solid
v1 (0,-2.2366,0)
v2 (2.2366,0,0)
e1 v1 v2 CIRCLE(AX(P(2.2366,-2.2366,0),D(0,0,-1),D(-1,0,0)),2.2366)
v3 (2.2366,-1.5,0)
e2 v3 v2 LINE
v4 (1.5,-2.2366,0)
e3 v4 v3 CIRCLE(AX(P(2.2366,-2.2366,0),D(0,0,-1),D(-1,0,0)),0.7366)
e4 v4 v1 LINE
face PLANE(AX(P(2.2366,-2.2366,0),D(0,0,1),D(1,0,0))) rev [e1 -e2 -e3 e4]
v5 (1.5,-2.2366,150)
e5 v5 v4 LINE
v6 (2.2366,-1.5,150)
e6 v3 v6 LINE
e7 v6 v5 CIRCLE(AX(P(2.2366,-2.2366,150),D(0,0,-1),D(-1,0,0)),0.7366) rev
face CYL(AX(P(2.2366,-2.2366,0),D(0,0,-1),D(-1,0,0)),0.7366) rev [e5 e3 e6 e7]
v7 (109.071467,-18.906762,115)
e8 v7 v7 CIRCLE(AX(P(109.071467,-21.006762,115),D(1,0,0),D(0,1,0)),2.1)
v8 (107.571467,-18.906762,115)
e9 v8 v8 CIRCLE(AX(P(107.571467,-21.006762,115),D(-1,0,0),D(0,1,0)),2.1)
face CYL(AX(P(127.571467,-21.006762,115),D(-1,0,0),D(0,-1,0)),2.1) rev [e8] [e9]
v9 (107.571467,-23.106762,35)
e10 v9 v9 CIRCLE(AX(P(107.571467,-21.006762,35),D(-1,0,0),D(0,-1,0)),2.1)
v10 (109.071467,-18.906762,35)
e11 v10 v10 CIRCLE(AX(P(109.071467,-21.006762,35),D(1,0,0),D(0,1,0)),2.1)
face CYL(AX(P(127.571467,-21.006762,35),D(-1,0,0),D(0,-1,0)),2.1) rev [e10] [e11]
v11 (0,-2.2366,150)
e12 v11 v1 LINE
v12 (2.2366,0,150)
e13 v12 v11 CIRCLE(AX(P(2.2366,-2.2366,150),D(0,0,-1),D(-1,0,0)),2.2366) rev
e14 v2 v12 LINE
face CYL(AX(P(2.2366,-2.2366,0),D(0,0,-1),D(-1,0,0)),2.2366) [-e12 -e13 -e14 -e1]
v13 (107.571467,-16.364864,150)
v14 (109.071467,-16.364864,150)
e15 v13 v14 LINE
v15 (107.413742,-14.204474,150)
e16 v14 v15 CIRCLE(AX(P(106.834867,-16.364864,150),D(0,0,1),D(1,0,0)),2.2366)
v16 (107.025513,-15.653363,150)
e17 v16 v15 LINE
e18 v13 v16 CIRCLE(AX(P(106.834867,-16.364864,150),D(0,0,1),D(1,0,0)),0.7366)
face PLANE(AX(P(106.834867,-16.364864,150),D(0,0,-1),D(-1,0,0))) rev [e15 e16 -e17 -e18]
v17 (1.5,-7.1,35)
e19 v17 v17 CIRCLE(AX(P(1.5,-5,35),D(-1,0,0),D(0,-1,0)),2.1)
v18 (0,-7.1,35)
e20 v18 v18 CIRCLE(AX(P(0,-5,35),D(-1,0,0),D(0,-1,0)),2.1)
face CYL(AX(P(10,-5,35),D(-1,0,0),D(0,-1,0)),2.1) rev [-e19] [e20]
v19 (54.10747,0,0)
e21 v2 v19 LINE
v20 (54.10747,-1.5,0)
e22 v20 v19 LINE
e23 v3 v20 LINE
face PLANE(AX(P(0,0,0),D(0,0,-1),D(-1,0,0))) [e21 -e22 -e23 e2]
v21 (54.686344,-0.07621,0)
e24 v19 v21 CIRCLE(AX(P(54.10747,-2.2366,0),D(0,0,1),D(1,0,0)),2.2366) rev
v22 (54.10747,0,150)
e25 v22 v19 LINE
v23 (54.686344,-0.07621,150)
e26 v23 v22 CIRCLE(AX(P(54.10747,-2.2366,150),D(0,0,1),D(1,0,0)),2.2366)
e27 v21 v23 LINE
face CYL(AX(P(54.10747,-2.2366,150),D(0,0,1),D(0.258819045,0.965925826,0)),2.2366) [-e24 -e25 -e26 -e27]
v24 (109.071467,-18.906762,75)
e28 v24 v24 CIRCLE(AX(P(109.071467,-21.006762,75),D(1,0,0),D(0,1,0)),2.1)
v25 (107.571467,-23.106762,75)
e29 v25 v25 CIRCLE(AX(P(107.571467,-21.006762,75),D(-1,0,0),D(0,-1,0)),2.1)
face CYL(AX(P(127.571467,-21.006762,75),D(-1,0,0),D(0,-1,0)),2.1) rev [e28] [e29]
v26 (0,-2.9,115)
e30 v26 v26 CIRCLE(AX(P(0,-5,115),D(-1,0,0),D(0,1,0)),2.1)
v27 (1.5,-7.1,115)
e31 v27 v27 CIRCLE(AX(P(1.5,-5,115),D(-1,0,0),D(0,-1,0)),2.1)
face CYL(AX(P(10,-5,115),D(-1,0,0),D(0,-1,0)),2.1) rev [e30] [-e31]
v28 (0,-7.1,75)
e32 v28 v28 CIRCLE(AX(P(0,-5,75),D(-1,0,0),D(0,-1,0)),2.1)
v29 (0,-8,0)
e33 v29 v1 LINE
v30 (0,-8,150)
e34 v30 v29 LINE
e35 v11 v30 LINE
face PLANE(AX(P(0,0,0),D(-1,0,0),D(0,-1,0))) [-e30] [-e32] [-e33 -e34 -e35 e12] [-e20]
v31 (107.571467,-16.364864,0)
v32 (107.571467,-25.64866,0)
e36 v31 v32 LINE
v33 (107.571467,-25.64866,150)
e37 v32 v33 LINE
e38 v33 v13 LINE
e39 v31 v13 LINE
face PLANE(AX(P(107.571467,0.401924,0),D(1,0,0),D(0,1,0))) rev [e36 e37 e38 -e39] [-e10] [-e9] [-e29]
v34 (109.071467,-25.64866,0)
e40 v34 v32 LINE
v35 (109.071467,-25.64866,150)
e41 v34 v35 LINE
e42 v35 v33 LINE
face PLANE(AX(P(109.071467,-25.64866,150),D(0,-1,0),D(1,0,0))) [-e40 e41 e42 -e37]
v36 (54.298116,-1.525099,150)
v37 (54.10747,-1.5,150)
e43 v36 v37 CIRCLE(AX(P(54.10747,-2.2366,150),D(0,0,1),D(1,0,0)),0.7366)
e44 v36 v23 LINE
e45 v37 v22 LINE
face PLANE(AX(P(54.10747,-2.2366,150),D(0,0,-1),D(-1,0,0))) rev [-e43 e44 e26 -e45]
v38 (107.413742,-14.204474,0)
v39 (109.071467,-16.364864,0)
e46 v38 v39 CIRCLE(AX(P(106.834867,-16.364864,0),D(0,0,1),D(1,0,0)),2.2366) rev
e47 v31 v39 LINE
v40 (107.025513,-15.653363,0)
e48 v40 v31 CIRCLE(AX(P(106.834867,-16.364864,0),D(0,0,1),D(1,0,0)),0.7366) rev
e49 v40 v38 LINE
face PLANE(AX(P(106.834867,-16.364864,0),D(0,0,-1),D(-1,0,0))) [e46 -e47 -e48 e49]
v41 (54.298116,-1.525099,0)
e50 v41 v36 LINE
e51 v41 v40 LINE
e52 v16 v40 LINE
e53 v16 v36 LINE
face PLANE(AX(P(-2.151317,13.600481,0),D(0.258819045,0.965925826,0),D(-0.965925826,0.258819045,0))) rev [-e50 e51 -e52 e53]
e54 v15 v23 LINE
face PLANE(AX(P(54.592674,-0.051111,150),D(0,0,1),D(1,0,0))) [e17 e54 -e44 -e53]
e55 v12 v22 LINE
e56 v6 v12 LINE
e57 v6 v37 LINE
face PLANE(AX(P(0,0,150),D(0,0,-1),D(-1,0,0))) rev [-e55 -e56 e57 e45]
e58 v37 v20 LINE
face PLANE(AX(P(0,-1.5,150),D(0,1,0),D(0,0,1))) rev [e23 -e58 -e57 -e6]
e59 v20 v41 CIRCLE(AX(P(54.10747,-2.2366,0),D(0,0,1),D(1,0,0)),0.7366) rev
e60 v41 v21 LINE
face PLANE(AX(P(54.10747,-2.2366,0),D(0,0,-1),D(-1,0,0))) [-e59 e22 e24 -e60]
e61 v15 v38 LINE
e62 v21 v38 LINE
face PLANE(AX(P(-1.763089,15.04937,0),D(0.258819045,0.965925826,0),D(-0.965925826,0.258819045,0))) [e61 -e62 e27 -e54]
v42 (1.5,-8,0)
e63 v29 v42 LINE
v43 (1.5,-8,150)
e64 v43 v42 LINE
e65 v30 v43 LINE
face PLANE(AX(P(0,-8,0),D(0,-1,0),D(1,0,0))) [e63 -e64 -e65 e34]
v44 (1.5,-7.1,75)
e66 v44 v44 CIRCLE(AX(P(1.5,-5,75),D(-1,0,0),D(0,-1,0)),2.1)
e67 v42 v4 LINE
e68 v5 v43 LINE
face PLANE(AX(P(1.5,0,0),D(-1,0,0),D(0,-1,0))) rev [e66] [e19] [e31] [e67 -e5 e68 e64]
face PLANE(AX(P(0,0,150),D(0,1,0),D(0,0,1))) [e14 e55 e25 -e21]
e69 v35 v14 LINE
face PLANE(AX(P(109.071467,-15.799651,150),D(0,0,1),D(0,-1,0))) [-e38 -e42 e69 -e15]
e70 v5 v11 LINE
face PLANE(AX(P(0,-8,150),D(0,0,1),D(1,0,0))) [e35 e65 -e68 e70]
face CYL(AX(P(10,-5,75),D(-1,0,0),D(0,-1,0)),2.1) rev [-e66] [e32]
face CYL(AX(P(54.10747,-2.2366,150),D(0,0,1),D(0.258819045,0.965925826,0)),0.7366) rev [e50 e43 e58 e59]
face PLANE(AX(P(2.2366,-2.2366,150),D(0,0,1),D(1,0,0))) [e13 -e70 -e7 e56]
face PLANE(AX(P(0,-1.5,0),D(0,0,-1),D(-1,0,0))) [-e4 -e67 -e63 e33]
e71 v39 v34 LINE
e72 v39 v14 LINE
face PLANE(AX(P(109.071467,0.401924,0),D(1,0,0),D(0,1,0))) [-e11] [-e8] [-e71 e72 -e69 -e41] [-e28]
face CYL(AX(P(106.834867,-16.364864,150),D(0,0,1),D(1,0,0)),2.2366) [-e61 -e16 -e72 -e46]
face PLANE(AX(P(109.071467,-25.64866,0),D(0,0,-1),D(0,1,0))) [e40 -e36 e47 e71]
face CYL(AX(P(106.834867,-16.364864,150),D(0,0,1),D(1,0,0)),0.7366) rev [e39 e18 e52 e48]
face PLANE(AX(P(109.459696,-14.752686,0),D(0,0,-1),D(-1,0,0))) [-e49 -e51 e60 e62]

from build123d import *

# Parameters (mm, degrees)
SKETCH_1_W                       = 60
SKETCH_1_H                       = 1.5
SM_BASE_FLANGE_1_DEPTH           = 150
SM_EDGE_FLANGE_1_DEPTH           = 150
SM_EDGE_FLANGE_1_2_DEPTH         = 150
SM_EDGE_FLANGE_2_STRIP_W         = 7.4732
SM_EDGE_FLANGE_2_STRIP_H         = 1.5
SM_EDGE_FLANGE_2_STRIP_CUT_DEPTH = 150
SM_EDGE_FLANGE_2_DEPTH           = 150
SKETCH_12_R                      = 2.1
CUT_EXTRUDE_1_DEPTH              = 10
SM_EDGE_FLANGE_3_DEPTH           = 150
SM_EDGE_FLANGE_3_2_DEPTH         = 150
SKETCH_16_R                      = 2.1
CUT_EXTRUDE_2_DEPTH              = 20


# Read off the part's stored shape, not the designer's step: 边线-法兰1, 边线-法兰3
# Sheet-metal steps are written as plain solids
with BuildPart() as part:
    # Sketch 1 → 基体-法兰1 (new body)
    with BuildSketch(Plane.XY):
        with Locations((30, -0.75)):
            Rectangle(SKETCH_1_W, SKETCH_1_H)
    extrude(amount=SM_BASE_FLANGE_1_DEPTH)

    # 边线-法兰1 outline → 边线-法兰1 (cut)
    with BuildSketch(Plane.XY):
        with BuildLine():
            ThreePointArc((54.107469813, 0), (54.399404694, -0.019134423), (54.686344489, -0.076210297))
            Line((54.686344489, -0.076210297), (60, -1.5))
            Line((60, -1.5), (60, 0))
            Line((60, 0), (54.107469813, 0))
        make_face()
    extrude(amount=SM_EDGE_FLANGE_1_DEPTH, mode=Mode.SUBTRACT)

    # Sm Edge Flange 1 2 outline → Sm Edge Flange 1 2 (add)
    with BuildSketch(Plane.XY):
        with BuildLine():
            Line((109.459695887, -14.752685571), (60, -1.5))
            Line((60, -1.5), (54.107469813, -1.5))
            ThreePointArc((54.107469813, -1.5), (54.203615406, -1.506301715), (54.298115921, -1.525099036))
            Line((54.298115921, -1.525099036), (109.071467319, -16.20157431))
            Line((109.071467319, -16.20157431), (109.459695887, -14.752685571))
        make_face()
    extrude(amount=SM_EDGE_FLANGE_1_2_DEPTH)

    # 边线-法兰2 strip (across the edge) → 边线-法兰2 strip cut (cut)
    with BuildSketch(Plane(origin=(0, -1.5, 150), x_dir=(1, 0, 0), z_dir=(0, 0, -1))):
        with Locations((-1.5, -0.75)):
            Rectangle(SM_EDGE_FLANGE_2_STRIP_W, SM_EDGE_FLANGE_2_STRIP_H)
    extrude(amount=SM_EDGE_FLANGE_2_STRIP_CUT_DEPTH, mode=Mode.SUBTRACT)

    # 边线-法兰2 section (across the edge) → 边线-法兰2 (add)
    with BuildSketch(Plane(origin=(0, -1.5, 150), x_dir=(1, 0, 0), z_dir=(0, 0, -1))):
        with BuildLine():
            Line((0, 0.7366), (0, 6.5))
            Line((0, 6.5), (1.5, 6.5))
            Line((1.5, 6.5), (1.5, 0.7366))
            ThreePointArc((1.5, 0.7366), (1.715745145, 0.215745145), (2.2366, 0))
            Line((2.2366, 0), (2.2366, -1.5))
            ThreePointArc((2.2366, -1.5), (0.655084973, -0.844915027), (0, 0.7366))
        make_face()
    extrude(amount=SM_EDGE_FLANGE_2_DEPTH)

    # 草图12 → 切除-拉伸1 (cut)
    with BuildSketch(Plane.ZY):
        with Locations(Location((35, -5, 0), (0, 0, 270))):
            Circle(SKETCH_12_R)
        with Locations(Location((75, -5, 0), (0, 0, 270))):
            Circle(SKETCH_12_R)
        with Locations(Location((115, -5, 0), (0, 0, 270))):
            Circle(SKETCH_12_R)
    extrude(amount=-CUT_EXTRUDE_1_DEPTH, mode=Mode.SUBTRACT)

    # 边线-法兰3 outline → 边线-法兰3 (cut)
    with BuildSketch(Plane.XY):
        with BuildLine():
            ThreePointArc((107.413741996, -14.204473878), (108.55784048, -14.938769949), (109.065378631, -16.199942851))
            Line((109.065378631, -16.199942851), (109.071467319, -16.20157431))
            Line((109.071467319, -16.20157431), (109.459695887, -14.752685571))
            Line((109.459695887, -14.752685571), (107.413741996, -14.204473878))
        make_face()
    extrude(amount=SM_EDGE_FLANGE_3_DEPTH, mode=Mode.SUBTRACT)

    # Sm Edge Flange 3 2 outline → Sm Edge Flange 3 2 (add)
    with BuildSketch(Plane.XY):
        with BuildLine():
            Line((109.071467319, -25.64866004), (109.071467319, -16.364863581))
            ThreePointArc((109.071467319, -16.364863581), (109.069944629, -16.282347038), (109.065378631, -16.199942851))
            Line((109.065378631, -16.199942851), (107.025513428, -15.653362617))
            ThreePointArc((107.025513428, -15.653362617), (107.41925139, -15.916449912), (107.571467319, -16.364863581))
            Line((107.571467319, -16.364863581), (107.571467319, -25.64866004))
            Line((107.571467319, -25.64866004), (109.071467319, -25.64866004))
        make_face()
    extrude(amount=SM_EDGE_FLANGE_3_2_DEPTH)

    # 草图16 → 切除-拉伸2 (cut)
    with BuildSketch(Plane.ZY.offset(-107.571467319)):
        with Locations(Location((35, -21.00676181, 0), (0, 0, 270))):
            Circle(SKETCH_16_R)
        with Locations(Location((75, -21.00676181, 0), (0, 0, 270))):
            Circle(SKETCH_16_R)
        with Locations(Location((115, -21.00676181, 0), (0, 0, 90))):
            Circle(SKETCH_16_R)
    extrude(amount=-CUT_EXTRUDE_2_DEPTH, mode=Mode.SUBTRACT)


solid = part.part
